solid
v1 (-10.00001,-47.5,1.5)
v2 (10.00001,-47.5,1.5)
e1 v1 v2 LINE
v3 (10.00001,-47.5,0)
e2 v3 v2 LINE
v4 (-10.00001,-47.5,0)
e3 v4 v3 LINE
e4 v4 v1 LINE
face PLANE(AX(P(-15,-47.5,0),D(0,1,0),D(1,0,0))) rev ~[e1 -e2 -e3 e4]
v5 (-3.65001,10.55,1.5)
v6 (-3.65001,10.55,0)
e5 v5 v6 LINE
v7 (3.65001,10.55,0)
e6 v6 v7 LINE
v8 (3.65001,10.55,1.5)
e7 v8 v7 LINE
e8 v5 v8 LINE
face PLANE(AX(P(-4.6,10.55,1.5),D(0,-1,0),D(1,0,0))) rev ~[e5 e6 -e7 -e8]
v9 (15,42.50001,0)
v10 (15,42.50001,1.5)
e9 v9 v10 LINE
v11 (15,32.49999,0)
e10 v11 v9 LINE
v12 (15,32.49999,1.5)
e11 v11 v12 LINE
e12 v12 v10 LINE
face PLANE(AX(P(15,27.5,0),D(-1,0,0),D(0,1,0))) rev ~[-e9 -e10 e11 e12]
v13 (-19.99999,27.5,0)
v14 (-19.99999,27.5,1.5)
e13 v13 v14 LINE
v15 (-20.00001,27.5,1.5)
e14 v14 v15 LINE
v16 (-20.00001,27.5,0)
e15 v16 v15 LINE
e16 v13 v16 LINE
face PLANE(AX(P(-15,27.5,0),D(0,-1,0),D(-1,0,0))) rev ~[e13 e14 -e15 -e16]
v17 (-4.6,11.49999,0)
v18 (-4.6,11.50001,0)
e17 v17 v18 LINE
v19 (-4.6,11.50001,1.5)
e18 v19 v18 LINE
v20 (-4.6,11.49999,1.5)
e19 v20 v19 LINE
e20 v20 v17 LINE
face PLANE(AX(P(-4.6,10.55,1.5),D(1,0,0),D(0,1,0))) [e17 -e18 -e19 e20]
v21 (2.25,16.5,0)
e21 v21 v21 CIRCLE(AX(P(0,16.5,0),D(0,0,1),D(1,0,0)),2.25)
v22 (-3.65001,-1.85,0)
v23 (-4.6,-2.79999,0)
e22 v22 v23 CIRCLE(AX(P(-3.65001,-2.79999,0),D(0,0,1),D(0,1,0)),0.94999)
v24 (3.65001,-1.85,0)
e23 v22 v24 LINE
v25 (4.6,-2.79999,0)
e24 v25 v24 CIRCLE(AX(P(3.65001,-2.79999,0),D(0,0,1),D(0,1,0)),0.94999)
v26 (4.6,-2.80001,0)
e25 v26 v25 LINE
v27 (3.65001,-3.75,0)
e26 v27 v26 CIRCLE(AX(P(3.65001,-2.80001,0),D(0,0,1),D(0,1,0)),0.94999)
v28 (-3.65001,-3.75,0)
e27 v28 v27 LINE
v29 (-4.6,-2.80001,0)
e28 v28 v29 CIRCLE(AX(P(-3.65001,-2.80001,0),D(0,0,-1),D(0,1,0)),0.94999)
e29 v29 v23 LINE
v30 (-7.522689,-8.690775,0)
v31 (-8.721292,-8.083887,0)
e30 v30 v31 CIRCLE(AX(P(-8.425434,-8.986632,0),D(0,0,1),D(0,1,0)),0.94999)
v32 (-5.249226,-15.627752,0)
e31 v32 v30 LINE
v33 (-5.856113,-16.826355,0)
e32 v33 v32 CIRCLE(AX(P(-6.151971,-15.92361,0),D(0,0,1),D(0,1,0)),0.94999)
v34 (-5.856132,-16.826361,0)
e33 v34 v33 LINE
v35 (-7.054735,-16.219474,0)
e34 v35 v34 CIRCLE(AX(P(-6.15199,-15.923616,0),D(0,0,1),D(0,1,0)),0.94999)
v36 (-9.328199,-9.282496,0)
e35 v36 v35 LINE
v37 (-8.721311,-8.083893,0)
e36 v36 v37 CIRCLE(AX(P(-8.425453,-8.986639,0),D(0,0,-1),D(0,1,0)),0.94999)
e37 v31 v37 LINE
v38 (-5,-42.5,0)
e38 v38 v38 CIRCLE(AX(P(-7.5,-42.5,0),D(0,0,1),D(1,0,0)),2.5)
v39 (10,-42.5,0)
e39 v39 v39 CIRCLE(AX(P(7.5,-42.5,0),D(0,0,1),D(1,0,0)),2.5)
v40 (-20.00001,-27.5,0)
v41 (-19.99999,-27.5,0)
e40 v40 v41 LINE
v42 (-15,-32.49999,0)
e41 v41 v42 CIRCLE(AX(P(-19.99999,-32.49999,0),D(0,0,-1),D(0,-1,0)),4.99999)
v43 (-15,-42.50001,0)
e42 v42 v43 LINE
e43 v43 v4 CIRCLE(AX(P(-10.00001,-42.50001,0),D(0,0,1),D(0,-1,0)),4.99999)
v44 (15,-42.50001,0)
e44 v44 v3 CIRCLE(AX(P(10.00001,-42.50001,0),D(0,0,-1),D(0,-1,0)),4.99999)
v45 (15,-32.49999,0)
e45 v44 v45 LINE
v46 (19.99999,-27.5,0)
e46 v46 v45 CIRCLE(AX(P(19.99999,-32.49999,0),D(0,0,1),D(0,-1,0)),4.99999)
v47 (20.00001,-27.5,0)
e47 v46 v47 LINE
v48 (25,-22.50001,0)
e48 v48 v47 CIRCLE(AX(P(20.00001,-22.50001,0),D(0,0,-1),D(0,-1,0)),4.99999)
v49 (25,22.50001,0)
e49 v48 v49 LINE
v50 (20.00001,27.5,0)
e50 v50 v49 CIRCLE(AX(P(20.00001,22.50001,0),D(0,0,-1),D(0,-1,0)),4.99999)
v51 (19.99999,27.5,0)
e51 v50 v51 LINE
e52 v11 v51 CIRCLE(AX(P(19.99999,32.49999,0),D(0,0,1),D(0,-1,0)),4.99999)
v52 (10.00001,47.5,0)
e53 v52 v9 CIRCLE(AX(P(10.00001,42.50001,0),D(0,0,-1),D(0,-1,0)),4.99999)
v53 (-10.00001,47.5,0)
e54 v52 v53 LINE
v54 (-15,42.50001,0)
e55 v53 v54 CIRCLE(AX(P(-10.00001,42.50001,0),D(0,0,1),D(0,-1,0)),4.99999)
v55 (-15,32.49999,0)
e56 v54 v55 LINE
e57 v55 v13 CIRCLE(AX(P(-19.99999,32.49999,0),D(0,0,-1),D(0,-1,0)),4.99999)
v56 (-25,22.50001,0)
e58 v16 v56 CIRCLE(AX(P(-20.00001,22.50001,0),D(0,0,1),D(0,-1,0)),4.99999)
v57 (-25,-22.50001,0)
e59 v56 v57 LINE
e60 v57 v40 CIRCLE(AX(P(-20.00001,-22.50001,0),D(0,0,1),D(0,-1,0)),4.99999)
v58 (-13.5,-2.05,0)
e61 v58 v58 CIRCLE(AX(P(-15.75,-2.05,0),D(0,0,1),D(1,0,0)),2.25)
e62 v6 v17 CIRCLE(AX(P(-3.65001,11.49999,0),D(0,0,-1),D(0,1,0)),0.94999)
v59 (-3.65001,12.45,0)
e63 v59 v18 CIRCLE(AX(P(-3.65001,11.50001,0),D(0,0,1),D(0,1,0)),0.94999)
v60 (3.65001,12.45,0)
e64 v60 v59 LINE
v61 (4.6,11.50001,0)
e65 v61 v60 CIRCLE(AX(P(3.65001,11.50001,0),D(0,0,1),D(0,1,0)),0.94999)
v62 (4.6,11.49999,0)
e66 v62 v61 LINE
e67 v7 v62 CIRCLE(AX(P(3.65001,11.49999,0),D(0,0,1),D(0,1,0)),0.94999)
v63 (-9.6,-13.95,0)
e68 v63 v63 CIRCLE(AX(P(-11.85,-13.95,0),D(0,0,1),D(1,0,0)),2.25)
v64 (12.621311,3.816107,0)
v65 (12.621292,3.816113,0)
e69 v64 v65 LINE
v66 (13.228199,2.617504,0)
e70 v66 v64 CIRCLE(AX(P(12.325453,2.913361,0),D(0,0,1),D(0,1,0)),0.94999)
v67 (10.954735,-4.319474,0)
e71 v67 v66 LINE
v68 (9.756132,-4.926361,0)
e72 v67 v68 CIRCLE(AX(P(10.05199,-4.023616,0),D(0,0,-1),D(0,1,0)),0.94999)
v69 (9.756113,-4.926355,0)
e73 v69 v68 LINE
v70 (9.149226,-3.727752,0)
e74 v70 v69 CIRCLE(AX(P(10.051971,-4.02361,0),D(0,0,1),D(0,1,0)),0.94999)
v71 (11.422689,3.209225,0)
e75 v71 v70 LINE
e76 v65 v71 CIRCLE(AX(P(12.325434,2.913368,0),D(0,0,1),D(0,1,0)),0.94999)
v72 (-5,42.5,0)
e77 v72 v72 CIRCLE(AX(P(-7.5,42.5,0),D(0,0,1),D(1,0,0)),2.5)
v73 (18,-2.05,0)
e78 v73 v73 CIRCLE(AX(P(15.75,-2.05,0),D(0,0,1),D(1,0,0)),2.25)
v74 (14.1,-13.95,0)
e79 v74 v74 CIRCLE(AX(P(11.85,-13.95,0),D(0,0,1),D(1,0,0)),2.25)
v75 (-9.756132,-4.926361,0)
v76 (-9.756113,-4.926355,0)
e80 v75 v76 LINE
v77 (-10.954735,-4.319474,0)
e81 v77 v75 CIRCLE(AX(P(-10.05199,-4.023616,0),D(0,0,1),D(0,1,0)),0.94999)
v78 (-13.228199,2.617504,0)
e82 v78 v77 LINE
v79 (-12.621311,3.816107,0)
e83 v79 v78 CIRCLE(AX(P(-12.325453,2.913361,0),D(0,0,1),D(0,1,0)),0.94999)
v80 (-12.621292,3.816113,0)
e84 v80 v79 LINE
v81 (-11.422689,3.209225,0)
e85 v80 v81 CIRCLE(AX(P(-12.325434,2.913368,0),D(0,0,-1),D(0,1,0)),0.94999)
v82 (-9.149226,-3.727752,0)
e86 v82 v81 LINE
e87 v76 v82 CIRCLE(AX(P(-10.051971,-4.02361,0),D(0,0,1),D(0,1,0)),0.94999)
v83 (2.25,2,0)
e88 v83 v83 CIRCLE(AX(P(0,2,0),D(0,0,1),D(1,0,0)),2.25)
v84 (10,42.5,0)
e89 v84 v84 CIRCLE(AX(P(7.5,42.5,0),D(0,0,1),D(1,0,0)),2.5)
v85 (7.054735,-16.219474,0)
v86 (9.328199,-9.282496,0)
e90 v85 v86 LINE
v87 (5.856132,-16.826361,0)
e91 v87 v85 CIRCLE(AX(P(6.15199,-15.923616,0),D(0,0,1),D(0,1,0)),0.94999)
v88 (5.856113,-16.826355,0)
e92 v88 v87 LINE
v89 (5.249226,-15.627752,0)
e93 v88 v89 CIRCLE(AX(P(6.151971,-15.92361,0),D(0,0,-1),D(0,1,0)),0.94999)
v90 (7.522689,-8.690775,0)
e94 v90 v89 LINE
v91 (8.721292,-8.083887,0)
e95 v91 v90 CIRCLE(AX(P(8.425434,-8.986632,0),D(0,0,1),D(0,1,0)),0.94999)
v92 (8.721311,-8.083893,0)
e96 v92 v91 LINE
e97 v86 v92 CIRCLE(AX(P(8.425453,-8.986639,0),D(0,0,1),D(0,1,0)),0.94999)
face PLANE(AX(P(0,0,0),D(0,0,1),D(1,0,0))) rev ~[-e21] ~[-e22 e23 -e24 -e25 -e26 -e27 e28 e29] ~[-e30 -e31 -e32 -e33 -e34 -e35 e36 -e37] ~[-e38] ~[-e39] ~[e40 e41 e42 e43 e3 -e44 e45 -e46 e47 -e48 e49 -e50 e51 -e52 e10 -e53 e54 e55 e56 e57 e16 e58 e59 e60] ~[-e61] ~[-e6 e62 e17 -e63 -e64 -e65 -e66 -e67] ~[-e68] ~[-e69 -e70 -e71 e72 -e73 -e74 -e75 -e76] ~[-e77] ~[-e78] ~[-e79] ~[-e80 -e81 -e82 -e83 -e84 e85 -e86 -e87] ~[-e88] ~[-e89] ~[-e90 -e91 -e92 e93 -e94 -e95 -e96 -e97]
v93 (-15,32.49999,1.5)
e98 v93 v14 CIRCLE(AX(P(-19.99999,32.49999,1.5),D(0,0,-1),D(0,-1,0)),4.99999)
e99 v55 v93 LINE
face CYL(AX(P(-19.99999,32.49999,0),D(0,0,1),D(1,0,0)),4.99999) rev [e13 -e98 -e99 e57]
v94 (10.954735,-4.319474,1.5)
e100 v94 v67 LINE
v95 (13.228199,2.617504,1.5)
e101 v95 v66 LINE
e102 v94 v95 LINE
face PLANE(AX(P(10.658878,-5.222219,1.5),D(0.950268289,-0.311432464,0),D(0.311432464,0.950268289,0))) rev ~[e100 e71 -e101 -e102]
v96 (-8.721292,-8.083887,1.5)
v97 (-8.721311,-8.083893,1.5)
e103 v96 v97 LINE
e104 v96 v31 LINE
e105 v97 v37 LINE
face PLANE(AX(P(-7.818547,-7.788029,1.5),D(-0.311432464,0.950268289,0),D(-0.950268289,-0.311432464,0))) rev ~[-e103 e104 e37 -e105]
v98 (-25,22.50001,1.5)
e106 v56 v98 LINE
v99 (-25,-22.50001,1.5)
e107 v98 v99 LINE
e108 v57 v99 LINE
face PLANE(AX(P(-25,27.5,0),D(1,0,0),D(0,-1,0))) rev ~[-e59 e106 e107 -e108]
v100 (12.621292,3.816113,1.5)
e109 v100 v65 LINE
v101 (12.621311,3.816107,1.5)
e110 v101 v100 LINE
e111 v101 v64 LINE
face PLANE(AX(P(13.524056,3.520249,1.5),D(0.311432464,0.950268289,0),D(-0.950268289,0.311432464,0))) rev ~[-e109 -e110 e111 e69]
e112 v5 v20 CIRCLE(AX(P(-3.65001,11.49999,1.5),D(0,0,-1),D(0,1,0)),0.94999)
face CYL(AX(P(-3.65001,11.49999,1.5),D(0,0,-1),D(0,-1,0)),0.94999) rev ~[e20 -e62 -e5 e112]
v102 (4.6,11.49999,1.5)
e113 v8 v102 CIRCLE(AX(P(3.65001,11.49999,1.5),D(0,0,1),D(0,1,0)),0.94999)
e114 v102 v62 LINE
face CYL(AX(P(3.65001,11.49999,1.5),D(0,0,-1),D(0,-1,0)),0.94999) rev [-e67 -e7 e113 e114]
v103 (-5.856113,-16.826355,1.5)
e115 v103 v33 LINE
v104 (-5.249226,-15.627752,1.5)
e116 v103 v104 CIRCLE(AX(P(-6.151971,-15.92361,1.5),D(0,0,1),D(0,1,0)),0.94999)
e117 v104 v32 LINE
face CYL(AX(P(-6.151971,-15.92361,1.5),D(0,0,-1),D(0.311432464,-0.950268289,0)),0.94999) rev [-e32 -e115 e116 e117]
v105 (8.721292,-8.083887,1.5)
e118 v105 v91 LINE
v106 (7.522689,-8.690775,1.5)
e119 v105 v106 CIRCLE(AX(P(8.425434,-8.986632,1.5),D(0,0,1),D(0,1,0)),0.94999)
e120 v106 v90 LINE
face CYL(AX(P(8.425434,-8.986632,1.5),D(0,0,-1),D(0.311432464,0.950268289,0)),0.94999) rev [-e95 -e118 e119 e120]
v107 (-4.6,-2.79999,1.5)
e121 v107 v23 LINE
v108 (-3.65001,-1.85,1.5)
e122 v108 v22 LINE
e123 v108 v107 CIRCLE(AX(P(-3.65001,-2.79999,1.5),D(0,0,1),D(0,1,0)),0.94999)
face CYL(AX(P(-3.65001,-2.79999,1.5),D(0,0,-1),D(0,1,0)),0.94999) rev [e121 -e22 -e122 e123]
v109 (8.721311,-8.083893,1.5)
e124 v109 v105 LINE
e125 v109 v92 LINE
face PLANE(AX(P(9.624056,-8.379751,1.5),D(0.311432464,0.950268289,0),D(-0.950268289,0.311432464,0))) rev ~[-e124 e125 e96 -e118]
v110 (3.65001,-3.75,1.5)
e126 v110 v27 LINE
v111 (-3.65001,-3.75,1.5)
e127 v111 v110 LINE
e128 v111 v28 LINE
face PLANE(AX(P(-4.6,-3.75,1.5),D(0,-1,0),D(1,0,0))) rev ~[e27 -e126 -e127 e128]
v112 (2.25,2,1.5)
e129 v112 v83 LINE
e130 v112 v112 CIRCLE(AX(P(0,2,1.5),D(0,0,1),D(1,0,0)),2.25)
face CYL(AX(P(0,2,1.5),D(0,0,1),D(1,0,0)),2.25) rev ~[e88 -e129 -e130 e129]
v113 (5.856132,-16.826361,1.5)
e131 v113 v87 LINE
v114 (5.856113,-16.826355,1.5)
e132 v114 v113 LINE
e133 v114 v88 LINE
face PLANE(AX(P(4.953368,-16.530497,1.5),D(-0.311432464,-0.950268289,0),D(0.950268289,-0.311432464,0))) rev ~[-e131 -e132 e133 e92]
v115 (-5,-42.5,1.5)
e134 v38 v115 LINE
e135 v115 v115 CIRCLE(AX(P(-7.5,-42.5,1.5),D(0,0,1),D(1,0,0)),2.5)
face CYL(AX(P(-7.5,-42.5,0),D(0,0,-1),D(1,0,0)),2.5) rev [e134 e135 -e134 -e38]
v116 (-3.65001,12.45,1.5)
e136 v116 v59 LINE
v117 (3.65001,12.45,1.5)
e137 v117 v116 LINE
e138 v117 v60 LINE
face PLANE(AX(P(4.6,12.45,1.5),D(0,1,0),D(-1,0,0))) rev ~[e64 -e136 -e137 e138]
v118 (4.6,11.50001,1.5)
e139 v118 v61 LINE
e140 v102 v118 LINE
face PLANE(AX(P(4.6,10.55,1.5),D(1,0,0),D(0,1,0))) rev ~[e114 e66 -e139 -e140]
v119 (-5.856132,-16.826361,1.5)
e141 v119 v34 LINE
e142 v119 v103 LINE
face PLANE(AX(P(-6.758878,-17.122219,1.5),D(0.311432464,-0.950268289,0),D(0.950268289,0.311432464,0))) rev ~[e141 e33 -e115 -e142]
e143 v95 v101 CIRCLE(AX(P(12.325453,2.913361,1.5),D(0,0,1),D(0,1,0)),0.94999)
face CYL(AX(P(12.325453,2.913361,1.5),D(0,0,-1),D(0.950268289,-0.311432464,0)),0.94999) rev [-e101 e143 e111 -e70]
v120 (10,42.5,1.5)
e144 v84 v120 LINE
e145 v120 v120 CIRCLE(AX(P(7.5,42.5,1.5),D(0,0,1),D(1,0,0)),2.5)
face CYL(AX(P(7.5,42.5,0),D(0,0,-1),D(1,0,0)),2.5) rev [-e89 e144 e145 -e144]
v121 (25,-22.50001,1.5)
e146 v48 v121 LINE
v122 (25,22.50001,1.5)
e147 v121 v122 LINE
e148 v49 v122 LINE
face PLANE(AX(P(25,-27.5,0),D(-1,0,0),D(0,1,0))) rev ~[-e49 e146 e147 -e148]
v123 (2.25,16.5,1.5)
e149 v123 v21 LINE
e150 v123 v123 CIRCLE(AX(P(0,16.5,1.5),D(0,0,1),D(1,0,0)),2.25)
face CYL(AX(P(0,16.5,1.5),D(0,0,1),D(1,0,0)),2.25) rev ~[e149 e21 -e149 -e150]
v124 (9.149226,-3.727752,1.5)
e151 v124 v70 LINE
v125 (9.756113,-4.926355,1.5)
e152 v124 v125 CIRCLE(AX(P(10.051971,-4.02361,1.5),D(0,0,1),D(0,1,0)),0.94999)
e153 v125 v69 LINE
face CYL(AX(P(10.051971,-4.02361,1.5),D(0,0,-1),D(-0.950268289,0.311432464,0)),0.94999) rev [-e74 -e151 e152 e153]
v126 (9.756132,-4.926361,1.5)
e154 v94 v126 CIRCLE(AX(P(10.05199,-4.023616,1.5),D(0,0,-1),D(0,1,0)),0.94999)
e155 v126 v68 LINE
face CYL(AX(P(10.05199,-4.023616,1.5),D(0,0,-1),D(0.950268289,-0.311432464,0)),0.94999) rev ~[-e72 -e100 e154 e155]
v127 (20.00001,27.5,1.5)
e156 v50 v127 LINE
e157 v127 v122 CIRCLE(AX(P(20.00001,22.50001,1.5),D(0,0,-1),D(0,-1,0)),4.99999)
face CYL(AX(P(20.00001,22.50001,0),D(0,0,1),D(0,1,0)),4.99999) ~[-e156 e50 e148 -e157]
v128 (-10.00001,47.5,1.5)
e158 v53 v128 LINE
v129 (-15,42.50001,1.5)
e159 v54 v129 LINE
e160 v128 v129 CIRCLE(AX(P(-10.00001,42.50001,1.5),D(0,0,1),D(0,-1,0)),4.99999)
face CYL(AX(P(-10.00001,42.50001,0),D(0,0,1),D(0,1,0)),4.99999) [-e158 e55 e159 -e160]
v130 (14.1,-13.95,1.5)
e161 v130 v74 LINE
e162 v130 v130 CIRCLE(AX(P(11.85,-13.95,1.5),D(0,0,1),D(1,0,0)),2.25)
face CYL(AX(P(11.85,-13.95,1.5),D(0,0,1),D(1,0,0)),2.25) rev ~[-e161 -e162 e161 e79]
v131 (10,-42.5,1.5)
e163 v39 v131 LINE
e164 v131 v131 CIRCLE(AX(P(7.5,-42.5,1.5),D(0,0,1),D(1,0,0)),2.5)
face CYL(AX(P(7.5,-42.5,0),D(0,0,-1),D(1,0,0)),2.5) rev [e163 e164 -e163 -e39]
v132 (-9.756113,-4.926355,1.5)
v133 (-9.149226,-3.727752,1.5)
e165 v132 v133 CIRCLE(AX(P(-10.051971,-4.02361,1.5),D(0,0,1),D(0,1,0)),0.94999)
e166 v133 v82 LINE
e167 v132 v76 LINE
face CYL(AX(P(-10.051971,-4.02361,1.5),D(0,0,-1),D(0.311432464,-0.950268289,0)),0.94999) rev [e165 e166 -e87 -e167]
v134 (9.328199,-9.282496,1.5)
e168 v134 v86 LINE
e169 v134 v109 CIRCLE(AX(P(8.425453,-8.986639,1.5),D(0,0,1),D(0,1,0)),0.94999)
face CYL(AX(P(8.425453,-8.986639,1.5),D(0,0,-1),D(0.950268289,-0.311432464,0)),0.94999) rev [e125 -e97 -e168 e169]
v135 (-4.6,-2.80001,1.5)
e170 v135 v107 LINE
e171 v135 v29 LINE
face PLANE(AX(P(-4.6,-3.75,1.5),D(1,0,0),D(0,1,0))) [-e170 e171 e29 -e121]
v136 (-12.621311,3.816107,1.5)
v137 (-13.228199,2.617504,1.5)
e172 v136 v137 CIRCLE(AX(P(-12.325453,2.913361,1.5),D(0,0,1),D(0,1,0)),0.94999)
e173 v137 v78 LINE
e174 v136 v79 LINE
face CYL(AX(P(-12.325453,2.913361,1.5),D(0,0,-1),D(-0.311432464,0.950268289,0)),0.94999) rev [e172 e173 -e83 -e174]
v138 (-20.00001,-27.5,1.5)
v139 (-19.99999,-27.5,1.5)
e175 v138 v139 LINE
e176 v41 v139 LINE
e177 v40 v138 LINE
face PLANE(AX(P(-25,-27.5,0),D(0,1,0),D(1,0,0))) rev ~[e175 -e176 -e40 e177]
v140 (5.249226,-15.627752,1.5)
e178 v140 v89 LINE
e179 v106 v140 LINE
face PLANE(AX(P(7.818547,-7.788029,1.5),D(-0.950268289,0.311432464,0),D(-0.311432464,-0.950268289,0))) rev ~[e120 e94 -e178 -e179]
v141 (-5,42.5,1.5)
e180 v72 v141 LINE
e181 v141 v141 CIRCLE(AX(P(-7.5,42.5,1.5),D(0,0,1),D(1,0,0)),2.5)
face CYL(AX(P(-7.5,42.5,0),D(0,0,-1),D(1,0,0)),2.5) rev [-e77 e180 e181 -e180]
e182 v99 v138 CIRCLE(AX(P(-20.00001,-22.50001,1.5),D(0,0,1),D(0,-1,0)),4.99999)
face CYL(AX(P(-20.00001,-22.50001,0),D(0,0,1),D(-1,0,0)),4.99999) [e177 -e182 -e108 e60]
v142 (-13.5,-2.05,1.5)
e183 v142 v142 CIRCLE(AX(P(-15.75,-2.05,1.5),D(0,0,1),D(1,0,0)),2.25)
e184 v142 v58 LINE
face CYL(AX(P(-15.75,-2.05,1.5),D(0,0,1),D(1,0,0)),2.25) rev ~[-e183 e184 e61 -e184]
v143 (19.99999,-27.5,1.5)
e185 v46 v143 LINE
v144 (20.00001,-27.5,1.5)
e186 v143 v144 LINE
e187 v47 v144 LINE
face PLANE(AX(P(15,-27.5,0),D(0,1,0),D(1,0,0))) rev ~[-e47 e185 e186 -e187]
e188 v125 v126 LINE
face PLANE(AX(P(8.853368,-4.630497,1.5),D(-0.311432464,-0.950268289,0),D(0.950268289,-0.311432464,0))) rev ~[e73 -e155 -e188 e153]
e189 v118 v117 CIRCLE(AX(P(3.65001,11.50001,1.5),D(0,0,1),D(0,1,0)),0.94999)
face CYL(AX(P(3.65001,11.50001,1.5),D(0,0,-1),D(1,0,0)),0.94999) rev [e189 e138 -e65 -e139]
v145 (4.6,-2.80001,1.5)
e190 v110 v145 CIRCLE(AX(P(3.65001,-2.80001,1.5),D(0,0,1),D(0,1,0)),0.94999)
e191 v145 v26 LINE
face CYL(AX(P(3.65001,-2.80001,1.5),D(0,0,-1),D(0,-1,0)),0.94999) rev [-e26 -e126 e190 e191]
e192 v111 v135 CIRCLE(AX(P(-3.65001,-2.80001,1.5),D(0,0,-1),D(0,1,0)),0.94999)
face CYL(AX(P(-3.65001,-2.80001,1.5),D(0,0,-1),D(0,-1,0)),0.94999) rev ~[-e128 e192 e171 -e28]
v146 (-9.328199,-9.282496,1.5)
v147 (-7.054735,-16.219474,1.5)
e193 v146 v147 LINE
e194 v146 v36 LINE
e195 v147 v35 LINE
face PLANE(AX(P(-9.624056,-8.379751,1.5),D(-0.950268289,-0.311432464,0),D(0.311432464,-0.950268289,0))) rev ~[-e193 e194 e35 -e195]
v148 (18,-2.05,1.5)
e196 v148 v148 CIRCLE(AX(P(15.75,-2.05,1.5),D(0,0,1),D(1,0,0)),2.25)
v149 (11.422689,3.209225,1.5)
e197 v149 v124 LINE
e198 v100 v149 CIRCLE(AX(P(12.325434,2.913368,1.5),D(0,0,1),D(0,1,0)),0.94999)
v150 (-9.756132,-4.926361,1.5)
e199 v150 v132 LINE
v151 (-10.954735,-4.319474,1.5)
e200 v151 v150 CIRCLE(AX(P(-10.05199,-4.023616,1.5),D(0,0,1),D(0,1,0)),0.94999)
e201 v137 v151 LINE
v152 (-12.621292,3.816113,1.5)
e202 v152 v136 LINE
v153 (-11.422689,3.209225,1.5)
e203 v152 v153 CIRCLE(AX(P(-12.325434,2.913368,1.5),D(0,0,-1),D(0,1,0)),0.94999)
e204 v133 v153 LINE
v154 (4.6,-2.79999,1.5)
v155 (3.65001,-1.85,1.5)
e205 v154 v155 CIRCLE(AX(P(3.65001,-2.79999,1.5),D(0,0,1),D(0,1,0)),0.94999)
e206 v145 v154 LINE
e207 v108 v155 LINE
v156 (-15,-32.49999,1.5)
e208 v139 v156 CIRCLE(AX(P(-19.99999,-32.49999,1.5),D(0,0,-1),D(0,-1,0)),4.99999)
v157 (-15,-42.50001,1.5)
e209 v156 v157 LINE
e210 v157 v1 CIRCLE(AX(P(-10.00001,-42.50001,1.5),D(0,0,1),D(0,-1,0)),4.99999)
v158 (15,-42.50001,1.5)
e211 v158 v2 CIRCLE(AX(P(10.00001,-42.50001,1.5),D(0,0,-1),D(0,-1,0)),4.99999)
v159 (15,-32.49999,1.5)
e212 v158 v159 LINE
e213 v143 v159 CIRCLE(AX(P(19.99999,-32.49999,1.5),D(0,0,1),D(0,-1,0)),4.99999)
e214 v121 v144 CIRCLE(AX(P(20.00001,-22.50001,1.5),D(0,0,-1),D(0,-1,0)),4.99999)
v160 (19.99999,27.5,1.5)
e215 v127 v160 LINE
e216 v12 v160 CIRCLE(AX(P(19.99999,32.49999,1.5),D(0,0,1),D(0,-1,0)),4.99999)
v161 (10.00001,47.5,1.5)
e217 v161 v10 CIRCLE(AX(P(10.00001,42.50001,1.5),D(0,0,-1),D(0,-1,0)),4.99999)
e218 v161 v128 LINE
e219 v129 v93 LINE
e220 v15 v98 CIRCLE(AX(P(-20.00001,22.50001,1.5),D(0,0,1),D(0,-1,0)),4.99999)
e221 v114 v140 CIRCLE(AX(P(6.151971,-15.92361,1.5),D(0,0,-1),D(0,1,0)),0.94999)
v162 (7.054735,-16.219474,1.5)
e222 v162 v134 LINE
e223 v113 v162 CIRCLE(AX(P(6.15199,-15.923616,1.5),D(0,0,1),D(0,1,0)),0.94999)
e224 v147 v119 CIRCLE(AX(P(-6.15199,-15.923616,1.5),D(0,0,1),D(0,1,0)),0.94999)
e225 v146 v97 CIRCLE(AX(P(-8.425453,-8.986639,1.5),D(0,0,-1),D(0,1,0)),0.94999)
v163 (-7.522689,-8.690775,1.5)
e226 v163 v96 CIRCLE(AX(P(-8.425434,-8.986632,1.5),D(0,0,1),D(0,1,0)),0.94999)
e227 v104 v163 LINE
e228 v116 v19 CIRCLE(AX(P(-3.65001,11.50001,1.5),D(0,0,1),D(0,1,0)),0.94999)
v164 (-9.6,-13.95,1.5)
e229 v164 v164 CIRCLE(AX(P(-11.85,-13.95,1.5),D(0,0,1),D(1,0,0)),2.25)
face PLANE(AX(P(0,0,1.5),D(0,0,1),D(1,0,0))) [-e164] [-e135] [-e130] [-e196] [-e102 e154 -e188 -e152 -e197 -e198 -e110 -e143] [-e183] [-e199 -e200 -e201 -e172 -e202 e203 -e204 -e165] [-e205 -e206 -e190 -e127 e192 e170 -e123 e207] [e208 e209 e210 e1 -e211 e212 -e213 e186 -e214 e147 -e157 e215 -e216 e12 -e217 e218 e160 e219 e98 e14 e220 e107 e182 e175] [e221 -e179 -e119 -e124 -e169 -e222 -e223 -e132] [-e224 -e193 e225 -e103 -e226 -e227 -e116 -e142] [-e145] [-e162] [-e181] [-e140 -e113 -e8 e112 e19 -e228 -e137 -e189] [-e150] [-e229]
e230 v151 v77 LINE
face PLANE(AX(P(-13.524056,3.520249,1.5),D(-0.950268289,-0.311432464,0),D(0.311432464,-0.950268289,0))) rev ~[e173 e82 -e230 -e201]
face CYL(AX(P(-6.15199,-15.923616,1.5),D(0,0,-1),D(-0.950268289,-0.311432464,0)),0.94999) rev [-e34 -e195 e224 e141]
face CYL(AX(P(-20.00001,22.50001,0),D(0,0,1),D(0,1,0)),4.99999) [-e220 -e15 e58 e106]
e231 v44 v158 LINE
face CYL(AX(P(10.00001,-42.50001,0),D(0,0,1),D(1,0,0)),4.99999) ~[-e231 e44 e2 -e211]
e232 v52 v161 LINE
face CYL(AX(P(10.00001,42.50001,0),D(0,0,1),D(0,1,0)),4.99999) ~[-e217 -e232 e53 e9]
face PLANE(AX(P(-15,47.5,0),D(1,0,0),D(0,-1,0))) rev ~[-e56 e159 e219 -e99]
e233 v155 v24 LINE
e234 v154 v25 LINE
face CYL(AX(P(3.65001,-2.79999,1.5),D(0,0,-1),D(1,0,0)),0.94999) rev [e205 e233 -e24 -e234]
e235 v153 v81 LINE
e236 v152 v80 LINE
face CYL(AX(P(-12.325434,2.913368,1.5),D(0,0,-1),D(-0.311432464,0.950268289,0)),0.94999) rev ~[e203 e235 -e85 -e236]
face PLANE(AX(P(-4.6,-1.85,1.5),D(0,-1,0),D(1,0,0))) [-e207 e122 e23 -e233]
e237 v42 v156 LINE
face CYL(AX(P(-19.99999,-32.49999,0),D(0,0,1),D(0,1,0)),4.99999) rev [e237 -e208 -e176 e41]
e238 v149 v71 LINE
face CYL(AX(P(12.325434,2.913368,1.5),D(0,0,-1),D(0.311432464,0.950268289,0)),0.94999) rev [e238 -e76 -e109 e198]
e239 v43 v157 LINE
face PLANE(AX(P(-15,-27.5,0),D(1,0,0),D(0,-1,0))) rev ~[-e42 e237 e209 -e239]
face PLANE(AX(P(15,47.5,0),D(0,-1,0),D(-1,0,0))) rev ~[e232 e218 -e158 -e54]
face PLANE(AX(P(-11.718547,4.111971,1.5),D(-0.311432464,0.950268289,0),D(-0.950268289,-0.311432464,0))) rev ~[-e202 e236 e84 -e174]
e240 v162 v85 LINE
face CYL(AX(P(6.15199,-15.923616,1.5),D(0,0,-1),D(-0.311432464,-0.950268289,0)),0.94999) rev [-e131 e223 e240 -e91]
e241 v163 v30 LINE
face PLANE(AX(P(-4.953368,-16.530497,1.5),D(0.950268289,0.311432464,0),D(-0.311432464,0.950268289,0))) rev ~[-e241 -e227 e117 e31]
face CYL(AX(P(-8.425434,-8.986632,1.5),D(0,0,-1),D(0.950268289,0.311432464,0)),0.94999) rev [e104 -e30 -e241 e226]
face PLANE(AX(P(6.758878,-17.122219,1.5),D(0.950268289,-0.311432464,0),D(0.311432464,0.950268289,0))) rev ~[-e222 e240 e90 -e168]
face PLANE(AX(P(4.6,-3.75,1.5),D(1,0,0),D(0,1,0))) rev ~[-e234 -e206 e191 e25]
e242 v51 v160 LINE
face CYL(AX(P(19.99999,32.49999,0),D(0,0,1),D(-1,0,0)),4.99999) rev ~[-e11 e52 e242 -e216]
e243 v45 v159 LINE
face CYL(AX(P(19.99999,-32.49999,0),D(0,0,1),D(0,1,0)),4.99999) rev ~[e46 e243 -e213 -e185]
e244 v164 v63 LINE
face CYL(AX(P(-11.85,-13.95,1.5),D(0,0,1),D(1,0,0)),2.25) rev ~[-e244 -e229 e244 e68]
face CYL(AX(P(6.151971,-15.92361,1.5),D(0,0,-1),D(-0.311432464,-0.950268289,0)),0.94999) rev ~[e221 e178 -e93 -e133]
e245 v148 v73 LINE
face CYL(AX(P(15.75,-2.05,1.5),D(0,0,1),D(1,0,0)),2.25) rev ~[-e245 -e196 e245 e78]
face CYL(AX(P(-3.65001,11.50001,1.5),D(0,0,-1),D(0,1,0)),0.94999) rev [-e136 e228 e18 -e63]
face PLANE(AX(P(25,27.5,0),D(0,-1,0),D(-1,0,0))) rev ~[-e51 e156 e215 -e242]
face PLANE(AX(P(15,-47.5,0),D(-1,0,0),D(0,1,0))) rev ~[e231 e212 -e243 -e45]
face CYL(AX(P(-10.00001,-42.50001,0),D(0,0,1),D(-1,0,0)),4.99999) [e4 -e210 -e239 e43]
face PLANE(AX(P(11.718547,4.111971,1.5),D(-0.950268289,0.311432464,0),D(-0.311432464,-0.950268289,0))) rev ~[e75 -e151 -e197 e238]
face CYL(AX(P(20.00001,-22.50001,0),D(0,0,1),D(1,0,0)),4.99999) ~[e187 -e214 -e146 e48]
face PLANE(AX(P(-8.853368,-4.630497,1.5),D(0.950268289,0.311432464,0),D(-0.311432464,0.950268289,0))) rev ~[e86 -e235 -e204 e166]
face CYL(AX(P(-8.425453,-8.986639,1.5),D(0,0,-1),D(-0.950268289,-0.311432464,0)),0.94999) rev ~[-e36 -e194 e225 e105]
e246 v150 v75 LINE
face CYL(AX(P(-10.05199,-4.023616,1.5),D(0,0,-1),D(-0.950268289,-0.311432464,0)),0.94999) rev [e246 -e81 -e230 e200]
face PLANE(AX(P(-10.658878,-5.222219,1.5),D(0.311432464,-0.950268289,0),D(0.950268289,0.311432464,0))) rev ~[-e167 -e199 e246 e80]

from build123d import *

# Parameters (mm, degrees)
F0_R     = 2.5
F1_DEPTH = 1.5
F2_R     = 4.99999
F3_R     = 2.25
F4_DEPTH = 25
F5_W     = 4.6
F5_H     = 1.9
F5_W_2   = 9.2
F6_DEPTH = 25
F7_R     = 0.94999


# Not quite as in the source:
# - a fillet or chamfer is up to 0.001 mm smaller than in the source, because OpenCascade refuses the exact size


with BuildPart() as f1:
    # F0 (on Top) → F1 (new body)
    with BuildSketch(Plane.XY):
        Polygon((15, 47.5), (-15, 47.5), (-15, 27.5), (-25, 27.5), (-25, -27.5), (-15, -27.5), (-15, -47.5), (15, -47.5), (15, -27.5), (25, -27.5), (25, 27.5), (15, 27.5), align=None)
        with Locations((-7.5, -42.5)):
            Circle(F0_R, mode=Mode.SUBTRACT)
        with Locations((7.5, -42.5)):
            Circle(F0_R, mode=Mode.SUBTRACT)
        with Locations((-7.5, 42.5)):
            Circle(F0_R, mode=Mode.SUBTRACT)
        with Locations((7.5, 42.5)):
            Circle(F0_R, mode=Mode.SUBTRACT)
    extrude(amount=F1_DEPTH)

    # F2 (radius 5 in the source; OpenCascade refuses exactly that, so slightly less here)
    f2_edges = [f1.edges().sort_by_distance(p)[0] for p in [
        (15, 47.5, 0.75),
        (15, 27.5, 0.75),
        (25, 27.5, 0.75),
        (25, -27.5, 0.75),
        (15, -47.5, 0.75),
        (-15, 47.5, 0.75),
        (-15, 27.5, 0.75),
        (-25, 27.5, 0.75),
        (-25, -27.5, 0.75),
        (-15, -47.5, 0.75),
        (-15, -27.5, 0.75),
        (15, -27.5, 0.75),
    ]]
    fillet(f2_edges, radius=F2_R)

    # F3 (on face) → F4 (cut)
    with BuildSketch(Plane.XY.offset(1.5)):
        with Locations((0, 16.5)):
            Circle(F3_R)
        with Locations((0, 2)):
            Circle(F3_R)
        with Locations((15.75, -2.05)):
            Circle(F3_R)
        with Locations((-15.75, -2.05)):
            Circle(F3_R)
        with Locations((11.85, -13.95)):
            Circle(F3_R)
        with Locations((-11.85, -13.95)):
            Circle(F3_R)
    extrude(amount=-F4_DEPTH, mode=Mode.SUBTRACT)

    # F5 (on face) → F6 (cut)
    with BuildSketch(Plane.XY.offset(1.5)):
        with Locations((-2.3, 11.5)):
            Rectangle(F5_W, F5_H)
        with Locations((2.3, 11.5)):
            Rectangle(F5_W, F5_H)
        with Locations((0, -2.8)):
            Rectangle(F5_W_2, F5_H)
        Polygon((-11.7185466768, 4.111970797), (-13.524056425, 3.5202491148), (-10.6588777534, -5.2222191396), (-8.8533680052, -4.6304974575), align=None)
        Polygon((-9.624056425, -8.3797508852), (-6.7588777534, -17.1222191396), (-4.9533680052, -16.5304974575), (-7.8185466768, -7.788029203), align=None)
        Polygon((10.6588777534, -5.2222191396), (13.524056425, 3.5202491148), (11.7185466768, 4.111970797), (8.8533680052, -4.6304974575), align=None)
        Polygon((4.9533680052, -16.5304974575), (6.7588777534, -17.1222191396), (9.624056425, -8.3797508852), (7.8185466768, -7.788029203), align=None)
    extrude(amount=-F6_DEPTH, mode=Mode.SUBTRACT)

    # F7 (radius 0.95 in the source; OpenCascade refuses exactly that, so slightly less here)
    f7_edges = [f1.edges().sort_by_distance(p)[0] for p in [
        (13.524056, 3.520249, 0.75),
        (-8.853368, -4.630497, 0.75),
        (9.624056, -8.379751, 0.75),
        (-4.953368, -16.530497, 0.75),
        (-13.524056, 3.520249, 0.75),
        (-9.624056, -8.379751, 0.75),
        (8.853368, -4.630497, 0.75),
        (4.953368, -16.530497, 0.75),
        (-4.6, 12.45, 0.75),
        (-4.6, -1.85, 0.75),
        (-11.718547, 4.111971, 0.75),
        (11.718547, 4.111971, 0.75),
        (-7.818547, -7.788029, 0.75),
        (7.818547, -7.788029, 0.75),
        (4.6, -1.85, 0.75),
        (4.6, 12.45, 0.75),
        (10.658878, -5.222219, 0.75),
        (-10.658878, -5.222219, 0.75),
        (-4.6, -3.75, 0.75),
        (-4.6, 10.55, 0.75),
        (4.6, 10.55, 0.75),
        (4.6, -3.75, 0.75),
        (-6.758878, -17.122219, 0.75),
        (6.758878, -17.122219, 0.75),
    ]]
    fillet(f7_edges, radius=F7_R)


solid = f1.part
